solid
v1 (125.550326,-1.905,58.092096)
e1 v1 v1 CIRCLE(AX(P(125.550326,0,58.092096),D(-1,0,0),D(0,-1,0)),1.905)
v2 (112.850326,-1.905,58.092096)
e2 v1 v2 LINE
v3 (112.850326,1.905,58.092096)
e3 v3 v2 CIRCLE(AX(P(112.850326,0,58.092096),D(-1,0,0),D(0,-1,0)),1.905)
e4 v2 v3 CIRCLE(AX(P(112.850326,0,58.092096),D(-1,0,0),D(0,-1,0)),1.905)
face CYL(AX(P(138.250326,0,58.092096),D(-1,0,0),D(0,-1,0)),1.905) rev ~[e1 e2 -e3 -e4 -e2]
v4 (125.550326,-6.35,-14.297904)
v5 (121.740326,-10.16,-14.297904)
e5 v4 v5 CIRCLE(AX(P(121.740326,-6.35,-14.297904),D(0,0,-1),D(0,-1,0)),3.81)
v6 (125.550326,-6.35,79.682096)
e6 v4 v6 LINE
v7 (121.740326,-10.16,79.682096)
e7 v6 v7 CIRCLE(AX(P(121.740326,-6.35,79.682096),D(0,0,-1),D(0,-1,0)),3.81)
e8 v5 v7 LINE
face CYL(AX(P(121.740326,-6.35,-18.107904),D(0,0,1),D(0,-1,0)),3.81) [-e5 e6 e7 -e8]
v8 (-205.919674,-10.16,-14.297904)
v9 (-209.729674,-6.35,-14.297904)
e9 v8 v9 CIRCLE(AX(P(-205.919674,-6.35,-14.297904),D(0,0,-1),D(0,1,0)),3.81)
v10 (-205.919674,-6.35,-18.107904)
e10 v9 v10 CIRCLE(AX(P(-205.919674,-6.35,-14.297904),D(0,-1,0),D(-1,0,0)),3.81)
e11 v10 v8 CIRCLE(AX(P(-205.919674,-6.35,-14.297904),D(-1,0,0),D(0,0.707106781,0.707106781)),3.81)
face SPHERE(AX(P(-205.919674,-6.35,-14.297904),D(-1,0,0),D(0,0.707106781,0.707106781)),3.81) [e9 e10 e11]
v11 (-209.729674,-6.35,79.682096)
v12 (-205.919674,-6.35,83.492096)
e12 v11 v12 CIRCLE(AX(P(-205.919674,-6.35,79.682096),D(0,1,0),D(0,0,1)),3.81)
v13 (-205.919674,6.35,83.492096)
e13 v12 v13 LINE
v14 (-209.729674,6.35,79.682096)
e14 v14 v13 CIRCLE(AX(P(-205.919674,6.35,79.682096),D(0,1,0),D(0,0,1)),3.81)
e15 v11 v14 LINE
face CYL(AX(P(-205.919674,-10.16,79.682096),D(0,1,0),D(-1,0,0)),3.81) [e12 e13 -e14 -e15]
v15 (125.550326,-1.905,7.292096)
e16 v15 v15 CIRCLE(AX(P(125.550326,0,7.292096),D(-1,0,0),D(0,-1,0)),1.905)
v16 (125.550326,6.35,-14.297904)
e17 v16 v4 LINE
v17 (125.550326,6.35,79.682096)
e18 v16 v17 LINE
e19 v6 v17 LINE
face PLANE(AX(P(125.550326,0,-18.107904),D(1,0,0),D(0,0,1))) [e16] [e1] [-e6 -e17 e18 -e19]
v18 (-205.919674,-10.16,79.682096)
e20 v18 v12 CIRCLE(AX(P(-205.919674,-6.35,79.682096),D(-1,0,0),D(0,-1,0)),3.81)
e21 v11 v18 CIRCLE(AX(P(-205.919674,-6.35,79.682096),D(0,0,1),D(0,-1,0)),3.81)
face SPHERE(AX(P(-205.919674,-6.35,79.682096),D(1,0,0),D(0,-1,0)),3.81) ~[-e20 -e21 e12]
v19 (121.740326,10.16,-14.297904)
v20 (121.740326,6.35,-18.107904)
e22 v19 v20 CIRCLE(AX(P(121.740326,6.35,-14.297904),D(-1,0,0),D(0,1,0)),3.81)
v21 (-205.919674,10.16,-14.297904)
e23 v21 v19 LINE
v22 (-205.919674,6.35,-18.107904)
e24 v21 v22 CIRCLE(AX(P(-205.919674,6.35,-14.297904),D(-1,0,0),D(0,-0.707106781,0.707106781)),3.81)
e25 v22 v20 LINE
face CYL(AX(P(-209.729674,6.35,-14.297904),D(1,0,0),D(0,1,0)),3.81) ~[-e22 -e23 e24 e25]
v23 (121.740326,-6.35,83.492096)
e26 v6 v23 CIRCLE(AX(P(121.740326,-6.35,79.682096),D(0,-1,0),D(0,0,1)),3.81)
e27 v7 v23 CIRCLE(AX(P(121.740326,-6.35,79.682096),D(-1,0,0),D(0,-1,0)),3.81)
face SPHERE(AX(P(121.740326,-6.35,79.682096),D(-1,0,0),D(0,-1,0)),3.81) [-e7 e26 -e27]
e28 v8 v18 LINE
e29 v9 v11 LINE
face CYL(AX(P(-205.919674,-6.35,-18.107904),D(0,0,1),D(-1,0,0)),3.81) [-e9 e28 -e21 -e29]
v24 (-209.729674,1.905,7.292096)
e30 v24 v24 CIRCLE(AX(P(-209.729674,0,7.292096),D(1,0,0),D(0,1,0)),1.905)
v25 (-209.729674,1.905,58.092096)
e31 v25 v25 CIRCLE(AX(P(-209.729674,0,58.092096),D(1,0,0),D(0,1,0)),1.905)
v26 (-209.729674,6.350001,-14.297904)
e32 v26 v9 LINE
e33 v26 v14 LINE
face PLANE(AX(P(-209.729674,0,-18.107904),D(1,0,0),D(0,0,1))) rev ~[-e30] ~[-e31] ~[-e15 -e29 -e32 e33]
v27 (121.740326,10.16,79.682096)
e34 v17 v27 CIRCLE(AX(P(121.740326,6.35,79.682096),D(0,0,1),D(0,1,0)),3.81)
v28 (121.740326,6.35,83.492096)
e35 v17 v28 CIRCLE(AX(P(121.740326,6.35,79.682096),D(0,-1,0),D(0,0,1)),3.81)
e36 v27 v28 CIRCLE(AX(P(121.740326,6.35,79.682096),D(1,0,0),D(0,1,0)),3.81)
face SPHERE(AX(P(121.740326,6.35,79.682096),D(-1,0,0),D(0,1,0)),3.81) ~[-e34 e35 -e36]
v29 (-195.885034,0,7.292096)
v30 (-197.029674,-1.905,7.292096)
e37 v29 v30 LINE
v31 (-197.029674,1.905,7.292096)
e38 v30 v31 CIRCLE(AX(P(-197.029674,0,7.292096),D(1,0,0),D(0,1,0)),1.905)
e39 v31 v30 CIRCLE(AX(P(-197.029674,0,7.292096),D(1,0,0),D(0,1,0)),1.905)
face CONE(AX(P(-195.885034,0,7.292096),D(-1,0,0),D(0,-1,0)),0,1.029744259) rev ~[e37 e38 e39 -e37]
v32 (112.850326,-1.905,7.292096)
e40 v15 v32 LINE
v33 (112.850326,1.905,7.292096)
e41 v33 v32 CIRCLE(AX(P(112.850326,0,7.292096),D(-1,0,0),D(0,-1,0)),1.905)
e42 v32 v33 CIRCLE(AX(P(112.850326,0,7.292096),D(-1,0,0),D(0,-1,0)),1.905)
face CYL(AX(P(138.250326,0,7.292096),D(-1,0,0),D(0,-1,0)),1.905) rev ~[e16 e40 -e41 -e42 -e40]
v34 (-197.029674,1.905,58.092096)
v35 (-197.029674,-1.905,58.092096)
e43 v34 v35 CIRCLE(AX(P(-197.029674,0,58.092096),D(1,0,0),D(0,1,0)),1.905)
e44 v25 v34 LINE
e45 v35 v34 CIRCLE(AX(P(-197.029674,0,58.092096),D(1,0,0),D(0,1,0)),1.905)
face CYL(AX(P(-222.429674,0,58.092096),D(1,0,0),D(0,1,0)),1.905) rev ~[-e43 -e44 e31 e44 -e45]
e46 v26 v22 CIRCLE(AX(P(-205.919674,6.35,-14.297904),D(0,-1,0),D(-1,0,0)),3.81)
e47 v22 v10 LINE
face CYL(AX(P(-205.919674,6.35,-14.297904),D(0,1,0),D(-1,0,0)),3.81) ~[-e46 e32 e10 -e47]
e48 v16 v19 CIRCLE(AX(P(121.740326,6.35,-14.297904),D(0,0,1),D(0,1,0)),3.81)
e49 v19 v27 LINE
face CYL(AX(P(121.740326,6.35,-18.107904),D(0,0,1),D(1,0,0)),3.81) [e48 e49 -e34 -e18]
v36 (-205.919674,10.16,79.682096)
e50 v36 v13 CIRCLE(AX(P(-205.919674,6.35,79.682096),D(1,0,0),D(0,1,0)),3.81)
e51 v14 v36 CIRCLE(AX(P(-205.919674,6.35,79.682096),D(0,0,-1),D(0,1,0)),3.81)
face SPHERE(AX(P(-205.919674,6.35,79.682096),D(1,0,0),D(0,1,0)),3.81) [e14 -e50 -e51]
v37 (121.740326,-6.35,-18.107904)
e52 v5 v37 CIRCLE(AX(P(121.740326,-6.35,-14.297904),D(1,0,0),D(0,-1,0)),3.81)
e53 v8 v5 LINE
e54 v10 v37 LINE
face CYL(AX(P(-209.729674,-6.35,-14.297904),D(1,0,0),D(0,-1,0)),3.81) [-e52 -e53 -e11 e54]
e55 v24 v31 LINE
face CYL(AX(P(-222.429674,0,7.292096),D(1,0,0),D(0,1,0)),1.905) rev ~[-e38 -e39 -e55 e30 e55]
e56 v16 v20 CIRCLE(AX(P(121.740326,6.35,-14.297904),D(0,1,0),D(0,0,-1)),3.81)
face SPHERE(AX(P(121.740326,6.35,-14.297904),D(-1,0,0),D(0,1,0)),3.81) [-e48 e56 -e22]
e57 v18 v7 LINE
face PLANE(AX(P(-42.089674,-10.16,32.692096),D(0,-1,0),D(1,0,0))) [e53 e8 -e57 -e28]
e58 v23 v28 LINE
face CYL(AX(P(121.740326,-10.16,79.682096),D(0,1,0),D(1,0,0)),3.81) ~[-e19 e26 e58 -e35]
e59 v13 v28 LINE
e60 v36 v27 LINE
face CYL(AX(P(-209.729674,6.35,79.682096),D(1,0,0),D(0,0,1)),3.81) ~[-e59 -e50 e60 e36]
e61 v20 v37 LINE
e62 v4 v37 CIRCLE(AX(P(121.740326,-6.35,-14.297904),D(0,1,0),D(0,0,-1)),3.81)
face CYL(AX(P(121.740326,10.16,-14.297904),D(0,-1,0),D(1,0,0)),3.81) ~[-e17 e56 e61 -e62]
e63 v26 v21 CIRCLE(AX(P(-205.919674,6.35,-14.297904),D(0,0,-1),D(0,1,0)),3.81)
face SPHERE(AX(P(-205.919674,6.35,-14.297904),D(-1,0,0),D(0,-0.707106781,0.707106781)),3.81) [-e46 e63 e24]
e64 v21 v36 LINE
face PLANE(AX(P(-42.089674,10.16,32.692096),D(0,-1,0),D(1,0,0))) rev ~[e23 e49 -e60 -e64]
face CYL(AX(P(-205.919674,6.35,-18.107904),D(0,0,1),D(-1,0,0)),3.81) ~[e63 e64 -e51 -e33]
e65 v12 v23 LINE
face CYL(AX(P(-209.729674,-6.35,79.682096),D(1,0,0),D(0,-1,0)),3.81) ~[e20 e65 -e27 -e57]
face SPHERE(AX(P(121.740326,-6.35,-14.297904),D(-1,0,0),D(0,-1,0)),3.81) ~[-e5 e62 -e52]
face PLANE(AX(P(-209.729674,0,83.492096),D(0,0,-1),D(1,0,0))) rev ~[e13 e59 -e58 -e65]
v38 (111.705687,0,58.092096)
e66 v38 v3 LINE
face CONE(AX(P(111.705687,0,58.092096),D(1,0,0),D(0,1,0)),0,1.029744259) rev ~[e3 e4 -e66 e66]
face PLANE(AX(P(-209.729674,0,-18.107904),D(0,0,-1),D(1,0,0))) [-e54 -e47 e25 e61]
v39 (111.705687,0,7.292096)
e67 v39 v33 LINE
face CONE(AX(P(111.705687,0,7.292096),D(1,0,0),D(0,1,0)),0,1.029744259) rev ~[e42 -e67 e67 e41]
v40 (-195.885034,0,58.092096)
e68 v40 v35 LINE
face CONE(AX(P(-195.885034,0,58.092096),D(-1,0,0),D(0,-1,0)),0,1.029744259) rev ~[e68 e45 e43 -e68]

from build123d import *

# Parameters (mm, degrees)
F0_W         = 335.28
F0_H         = 101.6
F1_DEPTH     = 10.16
F2_R         = 3.81
F4_D         = 3.81
F4_DEPTH     = 12.7
F4_TIP       = 1.1446394792
F5_D         = 3.81
F5_DEPTH     = 12.7
F5_TIP       = 1.1446394792
F6_T1_DEPTH  = 12.7
F6_S5_W      = 3.81
F6_S5_H      = 3.81
F6_T6_DEPTH  = 3.81
F6_S11_W     = 3.81
F6_S11_H     = 3.81
F6_T12_DEPTH = 3.81
F8_D         = 3.81
F8_DEPTH     = 12.7
F8_TIP       = 1.1446394792
F9_D         = 3.81
F9_DEPTH     = 12.7
F9_TIP       = 1.1446394792


# Not quite as in the source:
# - a fillet or chamfer that OpenCascade refuses, or shapes differently, is made with other operations: its cross-section is extruded or revolved along the edge and cut away or added


with BuildPart() as f1:
    # F0 (on Front) → F1 (new body, symmetric)
    with BuildSketch(Plane.XZ):
        with Locations((-42.0896737862, 32.6920958787)):
            Rectangle(F0_W, F0_H)
    extrude(amount=F1_DEPTH, both=True)

    # F2
    f2_edges = [f1.edges().sort_by_distance(p)[0] for p in [
        (-42.089674, -10.16, 83.492096),
        (-209.729674, -10.16, 32.692096),
        (-42.089674, -10.16, -18.107904),
        (125.550326, -10.16, 32.692096),
        (-42.089674, 10.16, -18.107904),
        (-42.089674, 10.16, 83.492096),
        (-209.729674, 10.16, 32.692096),
        (125.550326, 10.16, 32.692096),
        (125.550326, 0, 83.492096),
        (125.550326, 0, -18.107904),
        (-209.729674, 0, 83.492096),
    ]]
    fillet(f2_edges, radius=F2_R)

    # F4
    with Locations(Plane.YZ.offset(125.5503262138)):
        with Locations((0, 58.0920958787)):
            Hole(F4_D / 2, depth=F4_DEPTH)
            with Locations((0, 0, -(F4_DEPTH + F4_TIP / 2))):  # 118° drill point
                Cone(0, F4_D / 2, F4_TIP, mode=Mode.SUBTRACT)

    # F5
    with Locations(Plane.YZ.offset(125.5503262138)):
        with Locations((0, 7.2920958787)):
            Hole(F5_D / 2, depth=F5_DEPTH)
            with Locations((0, 0, -(F5_DEPTH + F5_TIP / 2))):  # 118° drill point
                Cone(0, F5_D / 2, F5_TIP, mode=Mode.SUBTRACT)

    # F6: fillet of radius 3.81 on 1 edges, made by hand

    # F6_s2 → F6_t1 (cut)
    with BuildSketch(Plane.XZ.offset(-6.35)):
        with BuildLine():
            ThreePointArc((-209.7296737862, -14.2979041213), (-208.6137506225, -16.9919809576), (-205.9196737862, -18.1079041213))
            Line((-205.9196737862, -18.1079041213), (-209.7296737862, -18.1079041213))
            Line((-209.7296737862, -18.1079041213), (-209.7296737862, -14.2979041213))
        make_face()
    extrude(amount=F6_T1_DEPTH, mode=Mode.SUBTRACT)


with BuildPart() as f6_tool4:
    # F6_s5 → F6_t6 (new body)
    with BuildSketch(Plane.YZ.offset(-205.9196737862)):
        with Locations((8.255, -16.2029041213)):
            Rectangle(F6_S5_W, F6_S5_H)
    extrude(amount=-F6_T6_DEPTH)

    # F6_s7 → F6_t8 (revolve, cut)
    with BuildSketch(Plane(origin=(-205.9196737862, 6.35, -14.2979041213), x_dir=(0, -0.7071067812, 0.7071067812), z_dir=(0, -0.7071067812, -0.7071067812))):
        with BuildLine():
            ThreePointArc((0, -3.81), (3.81, 0), (0, 3.81))
            Line((0, 3.81), (0, -3.81))
        make_face()
    revolve(axis=Axis((-205.9196737862, 6.35, -14.2979041213), (-1, 0, 0)), mode=Mode.SUBTRACT)


with BuildPart() as f1_1:
    add(f1.part)

    # F6_t3: cut F6_tool4
    add(f6_tool4.part, mode=Mode.SUBTRACT)


with BuildPart() as f6_tool10:
    # F6_s11 → F6_t12 (new body)
    with BuildSketch(Plane.YZ.offset(-205.9196737862)):
        with Locations((-8.255, -16.2029041213)):
            Rectangle(F6_S11_W, F6_S11_H)
    extrude(amount=-F6_T12_DEPTH)

    # F6_s13 → F6_t14 (revolve, cut)
    with BuildSketch(Plane(origin=(-205.9196737862, -6.35, -14.2979041213), x_dir=(0, 0.7071067812, 0.7071067812), z_dir=(0, -0.7071067812, 0.7071067812))):
        with BuildLine():
            ThreePointArc((0, -3.81), (3.81, 0), (0, 3.81))
            Line((0, 3.81), (0, -3.81))
        make_face()
    revolve(axis=Axis((-205.9196737862, -6.35, -14.2979041213), (-1, 0, 0)), mode=Mode.SUBTRACT)


with BuildPart() as f1_2:
    add(f1_1.part)

    # F6_t9: cut F6_tool10
    add(f6_tool10.part, mode=Mode.SUBTRACT)

    # F8
    with Locations(Plane(origin=(-209.7296737862, 0, 0), x_dir=(0, -1, 0), z_dir=(-1, 0, 0))):
        with Locations((0, 58.0920958787)):
            Hole(F8_D / 2, depth=F8_DEPTH)
            with Locations((0, 0, -(F8_DEPTH + F8_TIP / 2))):  # 118° drill point
                Cone(0, F8_D / 2, F8_TIP, mode=Mode.SUBTRACT)

    # F9
    with Locations(Plane(origin=(-209.7296737862, 0, 0), x_dir=(0, -1, 0), z_dir=(-1, 0, 0))):
        with Locations((0, 7.2920958787)):
            Hole(F9_D / 2, depth=F9_DEPTH)
            with Locations((0, 0, -(F9_DEPTH + F9_TIP / 2))):  # 118° drill point
                Cone(0, F9_D / 2, F9_TIP, mode=Mode.SUBTRACT)


solid = f1_2.part
